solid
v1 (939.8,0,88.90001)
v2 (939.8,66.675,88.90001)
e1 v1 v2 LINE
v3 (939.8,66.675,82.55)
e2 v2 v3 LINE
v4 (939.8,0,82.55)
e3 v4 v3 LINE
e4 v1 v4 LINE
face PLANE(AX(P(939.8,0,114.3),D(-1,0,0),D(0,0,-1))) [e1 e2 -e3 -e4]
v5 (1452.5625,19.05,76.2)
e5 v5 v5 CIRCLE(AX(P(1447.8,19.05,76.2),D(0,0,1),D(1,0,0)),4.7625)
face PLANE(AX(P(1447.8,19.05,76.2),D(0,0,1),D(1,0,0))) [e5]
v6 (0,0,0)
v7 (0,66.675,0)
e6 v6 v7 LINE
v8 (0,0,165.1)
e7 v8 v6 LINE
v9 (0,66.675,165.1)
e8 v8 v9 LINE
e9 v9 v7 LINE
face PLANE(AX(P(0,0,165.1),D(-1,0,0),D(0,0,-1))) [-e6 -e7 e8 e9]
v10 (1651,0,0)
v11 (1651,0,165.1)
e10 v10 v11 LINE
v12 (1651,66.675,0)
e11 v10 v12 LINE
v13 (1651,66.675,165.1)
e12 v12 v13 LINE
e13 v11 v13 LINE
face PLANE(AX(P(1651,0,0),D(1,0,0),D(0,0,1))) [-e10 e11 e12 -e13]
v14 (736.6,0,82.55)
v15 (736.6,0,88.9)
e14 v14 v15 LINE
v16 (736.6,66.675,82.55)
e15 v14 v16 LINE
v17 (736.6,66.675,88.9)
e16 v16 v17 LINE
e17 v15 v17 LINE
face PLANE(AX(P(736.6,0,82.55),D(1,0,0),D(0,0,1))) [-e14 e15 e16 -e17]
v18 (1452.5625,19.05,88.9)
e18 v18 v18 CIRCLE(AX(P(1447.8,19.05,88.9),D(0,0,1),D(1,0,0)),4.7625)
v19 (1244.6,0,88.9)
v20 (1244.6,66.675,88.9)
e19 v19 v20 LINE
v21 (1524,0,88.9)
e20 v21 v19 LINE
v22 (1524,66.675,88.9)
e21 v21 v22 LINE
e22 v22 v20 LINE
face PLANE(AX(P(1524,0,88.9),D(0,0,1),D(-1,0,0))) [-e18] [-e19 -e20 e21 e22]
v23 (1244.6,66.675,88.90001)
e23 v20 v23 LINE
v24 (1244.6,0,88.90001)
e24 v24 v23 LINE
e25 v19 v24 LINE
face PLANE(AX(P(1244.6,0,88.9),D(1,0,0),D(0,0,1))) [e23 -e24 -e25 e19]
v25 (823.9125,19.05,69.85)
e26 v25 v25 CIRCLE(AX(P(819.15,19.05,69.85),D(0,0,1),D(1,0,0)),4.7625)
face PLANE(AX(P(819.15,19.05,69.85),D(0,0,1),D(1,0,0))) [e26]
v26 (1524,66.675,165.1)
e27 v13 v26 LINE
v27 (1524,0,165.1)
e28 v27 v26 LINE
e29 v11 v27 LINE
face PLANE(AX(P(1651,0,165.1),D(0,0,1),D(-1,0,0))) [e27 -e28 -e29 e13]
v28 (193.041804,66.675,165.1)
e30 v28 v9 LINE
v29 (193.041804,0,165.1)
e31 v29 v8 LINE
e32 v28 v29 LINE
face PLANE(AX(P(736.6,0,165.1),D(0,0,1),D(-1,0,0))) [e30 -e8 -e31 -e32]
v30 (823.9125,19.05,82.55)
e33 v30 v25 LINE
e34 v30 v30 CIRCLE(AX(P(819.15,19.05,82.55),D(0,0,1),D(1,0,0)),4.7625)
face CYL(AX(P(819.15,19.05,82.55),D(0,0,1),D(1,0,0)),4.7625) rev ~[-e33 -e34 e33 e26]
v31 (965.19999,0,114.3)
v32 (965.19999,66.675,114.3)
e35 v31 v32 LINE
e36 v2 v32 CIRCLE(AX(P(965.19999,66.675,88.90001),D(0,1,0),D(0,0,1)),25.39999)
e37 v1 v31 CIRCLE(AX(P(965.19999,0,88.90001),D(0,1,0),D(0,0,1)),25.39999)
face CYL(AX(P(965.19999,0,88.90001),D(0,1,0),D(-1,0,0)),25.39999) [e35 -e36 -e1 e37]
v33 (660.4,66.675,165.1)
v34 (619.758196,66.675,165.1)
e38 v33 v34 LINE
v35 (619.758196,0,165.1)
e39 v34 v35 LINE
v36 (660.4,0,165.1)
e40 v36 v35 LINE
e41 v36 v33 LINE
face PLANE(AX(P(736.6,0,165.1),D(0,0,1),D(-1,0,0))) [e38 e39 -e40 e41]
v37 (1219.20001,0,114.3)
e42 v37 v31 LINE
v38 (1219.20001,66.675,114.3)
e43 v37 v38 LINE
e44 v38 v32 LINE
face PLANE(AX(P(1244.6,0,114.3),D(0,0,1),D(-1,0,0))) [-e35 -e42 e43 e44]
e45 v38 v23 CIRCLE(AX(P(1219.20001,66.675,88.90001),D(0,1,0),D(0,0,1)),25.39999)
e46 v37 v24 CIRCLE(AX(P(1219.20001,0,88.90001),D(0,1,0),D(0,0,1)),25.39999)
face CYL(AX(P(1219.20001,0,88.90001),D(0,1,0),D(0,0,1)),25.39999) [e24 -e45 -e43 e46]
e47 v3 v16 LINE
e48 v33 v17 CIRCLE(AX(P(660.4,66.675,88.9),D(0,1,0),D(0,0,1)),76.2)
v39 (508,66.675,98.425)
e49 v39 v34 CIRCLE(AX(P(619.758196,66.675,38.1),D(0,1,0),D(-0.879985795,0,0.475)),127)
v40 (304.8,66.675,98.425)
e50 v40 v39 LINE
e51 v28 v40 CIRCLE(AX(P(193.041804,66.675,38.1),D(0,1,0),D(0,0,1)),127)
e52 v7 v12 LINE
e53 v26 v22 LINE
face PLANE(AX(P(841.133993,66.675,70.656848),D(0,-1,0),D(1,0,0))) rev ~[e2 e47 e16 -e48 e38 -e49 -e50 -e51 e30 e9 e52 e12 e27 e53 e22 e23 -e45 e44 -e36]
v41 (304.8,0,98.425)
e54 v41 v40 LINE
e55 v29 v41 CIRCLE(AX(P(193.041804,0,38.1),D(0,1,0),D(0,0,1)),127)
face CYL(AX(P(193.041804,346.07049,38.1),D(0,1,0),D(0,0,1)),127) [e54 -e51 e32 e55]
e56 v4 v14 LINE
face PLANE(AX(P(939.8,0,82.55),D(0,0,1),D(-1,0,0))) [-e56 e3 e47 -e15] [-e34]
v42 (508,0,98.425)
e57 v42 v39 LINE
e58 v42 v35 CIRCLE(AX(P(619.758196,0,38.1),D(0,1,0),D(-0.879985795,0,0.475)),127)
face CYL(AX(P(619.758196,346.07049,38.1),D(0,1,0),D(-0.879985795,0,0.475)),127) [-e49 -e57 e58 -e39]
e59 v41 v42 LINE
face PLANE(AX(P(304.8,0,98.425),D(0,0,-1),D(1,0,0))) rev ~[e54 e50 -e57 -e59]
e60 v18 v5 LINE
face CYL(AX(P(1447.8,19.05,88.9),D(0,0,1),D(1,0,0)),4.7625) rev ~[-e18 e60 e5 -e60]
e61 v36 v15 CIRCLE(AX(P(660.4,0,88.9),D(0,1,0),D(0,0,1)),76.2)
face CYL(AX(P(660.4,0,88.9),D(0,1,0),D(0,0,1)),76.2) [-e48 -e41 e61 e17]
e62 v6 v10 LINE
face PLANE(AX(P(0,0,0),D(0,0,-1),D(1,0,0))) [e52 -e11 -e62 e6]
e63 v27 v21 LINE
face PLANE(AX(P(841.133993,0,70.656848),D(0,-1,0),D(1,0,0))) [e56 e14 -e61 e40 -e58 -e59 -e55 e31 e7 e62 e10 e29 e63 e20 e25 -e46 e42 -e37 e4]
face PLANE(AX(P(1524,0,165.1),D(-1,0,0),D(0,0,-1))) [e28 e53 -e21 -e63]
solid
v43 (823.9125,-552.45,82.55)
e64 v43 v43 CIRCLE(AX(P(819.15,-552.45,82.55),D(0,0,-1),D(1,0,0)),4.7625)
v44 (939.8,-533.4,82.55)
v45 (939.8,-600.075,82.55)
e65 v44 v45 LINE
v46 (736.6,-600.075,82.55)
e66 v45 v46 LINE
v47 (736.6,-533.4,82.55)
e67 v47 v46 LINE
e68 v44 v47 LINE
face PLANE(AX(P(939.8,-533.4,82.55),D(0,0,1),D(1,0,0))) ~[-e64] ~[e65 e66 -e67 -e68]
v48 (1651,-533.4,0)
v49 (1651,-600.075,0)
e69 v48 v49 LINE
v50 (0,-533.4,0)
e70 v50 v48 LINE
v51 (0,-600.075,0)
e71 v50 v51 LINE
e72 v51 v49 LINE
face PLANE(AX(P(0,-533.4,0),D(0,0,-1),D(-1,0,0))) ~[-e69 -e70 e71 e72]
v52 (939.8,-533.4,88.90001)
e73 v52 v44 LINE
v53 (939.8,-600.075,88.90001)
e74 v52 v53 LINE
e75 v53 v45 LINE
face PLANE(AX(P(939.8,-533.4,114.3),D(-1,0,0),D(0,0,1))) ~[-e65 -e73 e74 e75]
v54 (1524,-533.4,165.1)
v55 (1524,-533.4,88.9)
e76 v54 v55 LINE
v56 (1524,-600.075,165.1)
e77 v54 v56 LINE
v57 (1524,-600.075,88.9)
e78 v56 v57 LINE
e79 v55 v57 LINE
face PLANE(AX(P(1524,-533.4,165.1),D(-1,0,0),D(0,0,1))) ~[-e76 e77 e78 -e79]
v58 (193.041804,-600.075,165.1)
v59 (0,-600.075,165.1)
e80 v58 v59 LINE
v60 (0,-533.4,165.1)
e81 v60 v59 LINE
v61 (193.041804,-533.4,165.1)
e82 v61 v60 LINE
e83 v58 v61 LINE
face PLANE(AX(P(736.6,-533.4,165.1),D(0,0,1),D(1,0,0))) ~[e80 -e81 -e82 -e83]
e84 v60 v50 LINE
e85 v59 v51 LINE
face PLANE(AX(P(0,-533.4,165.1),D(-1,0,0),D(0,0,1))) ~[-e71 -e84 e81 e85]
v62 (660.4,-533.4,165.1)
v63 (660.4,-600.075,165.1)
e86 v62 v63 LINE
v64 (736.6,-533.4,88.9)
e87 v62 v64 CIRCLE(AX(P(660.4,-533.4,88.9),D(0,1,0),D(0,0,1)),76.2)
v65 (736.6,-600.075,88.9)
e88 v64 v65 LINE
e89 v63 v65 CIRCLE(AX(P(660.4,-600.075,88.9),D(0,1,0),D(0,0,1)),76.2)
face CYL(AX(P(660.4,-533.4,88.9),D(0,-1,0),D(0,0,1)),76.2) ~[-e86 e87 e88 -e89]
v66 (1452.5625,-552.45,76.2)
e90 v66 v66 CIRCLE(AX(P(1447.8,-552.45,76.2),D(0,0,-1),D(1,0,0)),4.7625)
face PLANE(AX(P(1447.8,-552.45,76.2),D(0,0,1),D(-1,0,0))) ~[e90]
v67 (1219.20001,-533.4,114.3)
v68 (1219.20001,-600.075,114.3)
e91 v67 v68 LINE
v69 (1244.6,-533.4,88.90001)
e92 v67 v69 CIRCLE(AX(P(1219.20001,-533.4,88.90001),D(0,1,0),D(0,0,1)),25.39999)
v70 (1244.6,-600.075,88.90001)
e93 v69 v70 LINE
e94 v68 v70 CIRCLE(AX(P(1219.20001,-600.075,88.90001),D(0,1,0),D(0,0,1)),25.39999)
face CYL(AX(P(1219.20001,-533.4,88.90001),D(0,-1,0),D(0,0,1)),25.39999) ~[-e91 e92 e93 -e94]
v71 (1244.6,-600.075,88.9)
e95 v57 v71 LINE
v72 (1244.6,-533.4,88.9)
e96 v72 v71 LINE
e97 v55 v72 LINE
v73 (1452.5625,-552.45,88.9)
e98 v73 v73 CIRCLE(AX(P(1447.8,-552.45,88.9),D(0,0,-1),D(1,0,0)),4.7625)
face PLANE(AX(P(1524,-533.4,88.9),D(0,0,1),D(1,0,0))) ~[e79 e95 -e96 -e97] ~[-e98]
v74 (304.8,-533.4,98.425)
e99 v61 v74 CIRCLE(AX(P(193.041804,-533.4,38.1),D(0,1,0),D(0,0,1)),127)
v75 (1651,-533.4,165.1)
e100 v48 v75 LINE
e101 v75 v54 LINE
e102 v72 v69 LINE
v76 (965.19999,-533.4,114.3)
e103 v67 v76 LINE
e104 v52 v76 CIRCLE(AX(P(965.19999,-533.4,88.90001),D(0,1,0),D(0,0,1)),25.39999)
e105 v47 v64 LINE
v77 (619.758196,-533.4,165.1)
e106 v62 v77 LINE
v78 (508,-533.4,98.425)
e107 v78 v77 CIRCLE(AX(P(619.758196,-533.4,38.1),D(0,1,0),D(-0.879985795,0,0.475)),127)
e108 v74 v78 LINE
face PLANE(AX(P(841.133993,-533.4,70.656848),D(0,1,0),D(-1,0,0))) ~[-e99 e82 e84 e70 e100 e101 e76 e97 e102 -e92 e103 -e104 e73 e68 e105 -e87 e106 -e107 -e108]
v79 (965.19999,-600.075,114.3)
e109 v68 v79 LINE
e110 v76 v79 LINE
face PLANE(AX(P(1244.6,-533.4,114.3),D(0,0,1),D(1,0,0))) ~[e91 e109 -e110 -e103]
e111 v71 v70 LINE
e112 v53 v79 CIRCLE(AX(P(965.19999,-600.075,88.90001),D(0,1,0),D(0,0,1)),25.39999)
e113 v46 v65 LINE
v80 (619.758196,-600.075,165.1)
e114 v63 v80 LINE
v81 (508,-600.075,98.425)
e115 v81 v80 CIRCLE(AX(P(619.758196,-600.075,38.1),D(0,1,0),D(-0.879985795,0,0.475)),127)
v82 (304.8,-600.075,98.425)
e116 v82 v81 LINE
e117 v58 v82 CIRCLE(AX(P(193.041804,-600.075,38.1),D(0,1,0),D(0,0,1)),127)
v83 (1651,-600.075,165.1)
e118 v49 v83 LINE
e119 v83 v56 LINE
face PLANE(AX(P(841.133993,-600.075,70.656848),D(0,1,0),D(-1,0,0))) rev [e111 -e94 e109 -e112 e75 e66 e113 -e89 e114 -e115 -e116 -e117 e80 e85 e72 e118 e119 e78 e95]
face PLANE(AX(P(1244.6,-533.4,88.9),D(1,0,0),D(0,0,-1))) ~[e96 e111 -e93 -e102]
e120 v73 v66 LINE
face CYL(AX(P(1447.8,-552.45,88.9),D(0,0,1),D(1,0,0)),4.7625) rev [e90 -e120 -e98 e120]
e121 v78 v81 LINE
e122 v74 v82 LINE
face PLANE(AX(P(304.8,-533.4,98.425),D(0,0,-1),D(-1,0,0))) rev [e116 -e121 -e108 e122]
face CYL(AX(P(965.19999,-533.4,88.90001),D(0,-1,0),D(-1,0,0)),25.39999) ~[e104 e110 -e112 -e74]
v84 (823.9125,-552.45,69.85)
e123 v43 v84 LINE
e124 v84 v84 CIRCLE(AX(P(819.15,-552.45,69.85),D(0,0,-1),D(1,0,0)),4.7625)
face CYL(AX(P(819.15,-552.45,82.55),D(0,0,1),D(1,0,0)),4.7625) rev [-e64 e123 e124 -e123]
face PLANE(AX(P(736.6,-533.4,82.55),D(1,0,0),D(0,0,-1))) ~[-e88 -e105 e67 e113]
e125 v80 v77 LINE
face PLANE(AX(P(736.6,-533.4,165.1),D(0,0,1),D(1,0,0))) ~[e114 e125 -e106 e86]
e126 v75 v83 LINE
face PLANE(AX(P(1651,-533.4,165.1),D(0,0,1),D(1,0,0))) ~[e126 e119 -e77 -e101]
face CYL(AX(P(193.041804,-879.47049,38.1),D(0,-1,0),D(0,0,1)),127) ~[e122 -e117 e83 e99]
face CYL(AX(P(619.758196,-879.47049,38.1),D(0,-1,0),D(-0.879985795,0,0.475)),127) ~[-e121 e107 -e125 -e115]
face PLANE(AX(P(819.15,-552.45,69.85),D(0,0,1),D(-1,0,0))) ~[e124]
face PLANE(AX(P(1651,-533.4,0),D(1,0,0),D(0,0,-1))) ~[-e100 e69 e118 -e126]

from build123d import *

# Parameters (mm, degrees)
F1_DEPTH     = 66.675
F2_R         = 4.7625
F3_DEPTH     = 12.7
F4_R         = 4.7625
F5_DEPTH     = 12.7
F6_R         = 76.2
F7_R         = 25.39999
F10_W        = 203.2
F10_H        = 66.675
F11_DEPTH    = 66.676
F12_T1_DEPTH = 625.4659800408


# Not quite as in the source:
# - a fillet or chamfer that OpenCascade refuses, or shapes differently, is made with other operations: its cross-section is extruded or revolved along the edge and cut away or added
# - a fillet or chamfer is up to 0.001 mm smaller than in the source, because OpenCascade refuses the exact size


with BuildPart() as f1:
    # F0 (on Front) → F1 (new body)
    with BuildSketch(Plane.XZ):
        Polygon((0, 165.1), (0, 0), (1651, 0), (1651, 165.1), (1524, 165.1), (1524, 88.9), (1244.6, 88.9), (1244.6, 114.3), (939.8, 114.3), (939.8, 82.55), (736.6, 82.55), (736.6, 165.1), align=None)
    extrude(amount=-F1_DEPTH)

    # F2 (on face) → F3 (cut)
    with BuildSketch(Plane.XY.offset(82.55)):
        with Locations((819.15, 19.05)):
            Circle(F2_R)
    extrude(amount=-F3_DEPTH, mode=Mode.SUBTRACT)

    # F4 (on face) → F5 (cut)
    with BuildSketch(Plane.XY.offset(88.9)):
        with Locations((1447.8, 19.05)):
            Circle(F4_R)
    extrude(amount=-F5_DEPTH, mode=Mode.SUBTRACT)

    # F6
    f6_edges = [f1.edges().sort_by_distance(p)[0] for p in [
        (736.6, 33.3375, 165.1),
    ]]
    fillet(f6_edges, radius=F6_R)

    # F7 (radius 25.4 in the source; OpenCascade refuses exactly that, so slightly less here)
    f7_edges = [f1.edges().sort_by_distance(p)[0] for p in [
        (939.8, 33.3375, 114.3),
        (1244.6, 33.3375, 114.3),
    ]]
    fillet(f7_edges, radius=F7_R)


with BuildPart() as f9_1:
    # F9: instance of F1
    add(f1.part.mirror(Plane(origin=(751.1055710536, -266.7, 70.5390726634), x_dir=(1, 0, 0), z_dir=(0, -1, 0))))


with BuildPart() as f1_1:
    add(f1.part)

    # F10 (on face) → F11 (cut, through all)
    with BuildSketch(Plane.XZ):
        with Locations((406.4, 131.7625)):
            Rectangle(F10_W, F10_H)
    extrude(amount=-F11_DEPTH, mode=Mode.SUBTRACT)

    # F12: fillet of radius 127 on 2 edges, made by hand

    # F12_s2 → F12_t1 (cut)
    with BuildSketch(Plane.XZ.offset(-346.0704900204)):
        with BuildLine():
            ThreePointArc((193.0418039918, 165.1), (258.1099413557, 147.164831637), (304.8, 98.425))
            Line((304.8, 98.425), (304.8, 165.1))
            Line((304.8, 165.1), (193.0418039918, 165.1))
        make_face()
        with BuildLine():
            ThreePointArc((508, 98.425), (554.6900586443, 147.164831637), (619.7581960082, 165.1))
            Line((619.7581960082, 165.1), (508, 165.1))
            Line((508, 165.1), (508, 98.425))
        make_face()
    extrude(amount=F12_T1_DEPTH, mode=Mode.SUBTRACT)


with BuildPart() as f14_1:
    # F14: instance of F1
    add(f1_1.part.mirror(Plane(origin=(751.1055710536, -266.7, 70.5390726634), x_dir=(1, 0, 0), z_dir=(0, -1, 0))))


with BuildPart() as f16_1:
    # F16: instance of F1
    add(f1_1.part.mirror(Plane(origin=(751.1055710536, -266.7, 70.5390726634), x_dir=(1, 0, 0), z_dir=(0, -1, 0))))


solid = Compound([f1_1.part, f16_1.part])
